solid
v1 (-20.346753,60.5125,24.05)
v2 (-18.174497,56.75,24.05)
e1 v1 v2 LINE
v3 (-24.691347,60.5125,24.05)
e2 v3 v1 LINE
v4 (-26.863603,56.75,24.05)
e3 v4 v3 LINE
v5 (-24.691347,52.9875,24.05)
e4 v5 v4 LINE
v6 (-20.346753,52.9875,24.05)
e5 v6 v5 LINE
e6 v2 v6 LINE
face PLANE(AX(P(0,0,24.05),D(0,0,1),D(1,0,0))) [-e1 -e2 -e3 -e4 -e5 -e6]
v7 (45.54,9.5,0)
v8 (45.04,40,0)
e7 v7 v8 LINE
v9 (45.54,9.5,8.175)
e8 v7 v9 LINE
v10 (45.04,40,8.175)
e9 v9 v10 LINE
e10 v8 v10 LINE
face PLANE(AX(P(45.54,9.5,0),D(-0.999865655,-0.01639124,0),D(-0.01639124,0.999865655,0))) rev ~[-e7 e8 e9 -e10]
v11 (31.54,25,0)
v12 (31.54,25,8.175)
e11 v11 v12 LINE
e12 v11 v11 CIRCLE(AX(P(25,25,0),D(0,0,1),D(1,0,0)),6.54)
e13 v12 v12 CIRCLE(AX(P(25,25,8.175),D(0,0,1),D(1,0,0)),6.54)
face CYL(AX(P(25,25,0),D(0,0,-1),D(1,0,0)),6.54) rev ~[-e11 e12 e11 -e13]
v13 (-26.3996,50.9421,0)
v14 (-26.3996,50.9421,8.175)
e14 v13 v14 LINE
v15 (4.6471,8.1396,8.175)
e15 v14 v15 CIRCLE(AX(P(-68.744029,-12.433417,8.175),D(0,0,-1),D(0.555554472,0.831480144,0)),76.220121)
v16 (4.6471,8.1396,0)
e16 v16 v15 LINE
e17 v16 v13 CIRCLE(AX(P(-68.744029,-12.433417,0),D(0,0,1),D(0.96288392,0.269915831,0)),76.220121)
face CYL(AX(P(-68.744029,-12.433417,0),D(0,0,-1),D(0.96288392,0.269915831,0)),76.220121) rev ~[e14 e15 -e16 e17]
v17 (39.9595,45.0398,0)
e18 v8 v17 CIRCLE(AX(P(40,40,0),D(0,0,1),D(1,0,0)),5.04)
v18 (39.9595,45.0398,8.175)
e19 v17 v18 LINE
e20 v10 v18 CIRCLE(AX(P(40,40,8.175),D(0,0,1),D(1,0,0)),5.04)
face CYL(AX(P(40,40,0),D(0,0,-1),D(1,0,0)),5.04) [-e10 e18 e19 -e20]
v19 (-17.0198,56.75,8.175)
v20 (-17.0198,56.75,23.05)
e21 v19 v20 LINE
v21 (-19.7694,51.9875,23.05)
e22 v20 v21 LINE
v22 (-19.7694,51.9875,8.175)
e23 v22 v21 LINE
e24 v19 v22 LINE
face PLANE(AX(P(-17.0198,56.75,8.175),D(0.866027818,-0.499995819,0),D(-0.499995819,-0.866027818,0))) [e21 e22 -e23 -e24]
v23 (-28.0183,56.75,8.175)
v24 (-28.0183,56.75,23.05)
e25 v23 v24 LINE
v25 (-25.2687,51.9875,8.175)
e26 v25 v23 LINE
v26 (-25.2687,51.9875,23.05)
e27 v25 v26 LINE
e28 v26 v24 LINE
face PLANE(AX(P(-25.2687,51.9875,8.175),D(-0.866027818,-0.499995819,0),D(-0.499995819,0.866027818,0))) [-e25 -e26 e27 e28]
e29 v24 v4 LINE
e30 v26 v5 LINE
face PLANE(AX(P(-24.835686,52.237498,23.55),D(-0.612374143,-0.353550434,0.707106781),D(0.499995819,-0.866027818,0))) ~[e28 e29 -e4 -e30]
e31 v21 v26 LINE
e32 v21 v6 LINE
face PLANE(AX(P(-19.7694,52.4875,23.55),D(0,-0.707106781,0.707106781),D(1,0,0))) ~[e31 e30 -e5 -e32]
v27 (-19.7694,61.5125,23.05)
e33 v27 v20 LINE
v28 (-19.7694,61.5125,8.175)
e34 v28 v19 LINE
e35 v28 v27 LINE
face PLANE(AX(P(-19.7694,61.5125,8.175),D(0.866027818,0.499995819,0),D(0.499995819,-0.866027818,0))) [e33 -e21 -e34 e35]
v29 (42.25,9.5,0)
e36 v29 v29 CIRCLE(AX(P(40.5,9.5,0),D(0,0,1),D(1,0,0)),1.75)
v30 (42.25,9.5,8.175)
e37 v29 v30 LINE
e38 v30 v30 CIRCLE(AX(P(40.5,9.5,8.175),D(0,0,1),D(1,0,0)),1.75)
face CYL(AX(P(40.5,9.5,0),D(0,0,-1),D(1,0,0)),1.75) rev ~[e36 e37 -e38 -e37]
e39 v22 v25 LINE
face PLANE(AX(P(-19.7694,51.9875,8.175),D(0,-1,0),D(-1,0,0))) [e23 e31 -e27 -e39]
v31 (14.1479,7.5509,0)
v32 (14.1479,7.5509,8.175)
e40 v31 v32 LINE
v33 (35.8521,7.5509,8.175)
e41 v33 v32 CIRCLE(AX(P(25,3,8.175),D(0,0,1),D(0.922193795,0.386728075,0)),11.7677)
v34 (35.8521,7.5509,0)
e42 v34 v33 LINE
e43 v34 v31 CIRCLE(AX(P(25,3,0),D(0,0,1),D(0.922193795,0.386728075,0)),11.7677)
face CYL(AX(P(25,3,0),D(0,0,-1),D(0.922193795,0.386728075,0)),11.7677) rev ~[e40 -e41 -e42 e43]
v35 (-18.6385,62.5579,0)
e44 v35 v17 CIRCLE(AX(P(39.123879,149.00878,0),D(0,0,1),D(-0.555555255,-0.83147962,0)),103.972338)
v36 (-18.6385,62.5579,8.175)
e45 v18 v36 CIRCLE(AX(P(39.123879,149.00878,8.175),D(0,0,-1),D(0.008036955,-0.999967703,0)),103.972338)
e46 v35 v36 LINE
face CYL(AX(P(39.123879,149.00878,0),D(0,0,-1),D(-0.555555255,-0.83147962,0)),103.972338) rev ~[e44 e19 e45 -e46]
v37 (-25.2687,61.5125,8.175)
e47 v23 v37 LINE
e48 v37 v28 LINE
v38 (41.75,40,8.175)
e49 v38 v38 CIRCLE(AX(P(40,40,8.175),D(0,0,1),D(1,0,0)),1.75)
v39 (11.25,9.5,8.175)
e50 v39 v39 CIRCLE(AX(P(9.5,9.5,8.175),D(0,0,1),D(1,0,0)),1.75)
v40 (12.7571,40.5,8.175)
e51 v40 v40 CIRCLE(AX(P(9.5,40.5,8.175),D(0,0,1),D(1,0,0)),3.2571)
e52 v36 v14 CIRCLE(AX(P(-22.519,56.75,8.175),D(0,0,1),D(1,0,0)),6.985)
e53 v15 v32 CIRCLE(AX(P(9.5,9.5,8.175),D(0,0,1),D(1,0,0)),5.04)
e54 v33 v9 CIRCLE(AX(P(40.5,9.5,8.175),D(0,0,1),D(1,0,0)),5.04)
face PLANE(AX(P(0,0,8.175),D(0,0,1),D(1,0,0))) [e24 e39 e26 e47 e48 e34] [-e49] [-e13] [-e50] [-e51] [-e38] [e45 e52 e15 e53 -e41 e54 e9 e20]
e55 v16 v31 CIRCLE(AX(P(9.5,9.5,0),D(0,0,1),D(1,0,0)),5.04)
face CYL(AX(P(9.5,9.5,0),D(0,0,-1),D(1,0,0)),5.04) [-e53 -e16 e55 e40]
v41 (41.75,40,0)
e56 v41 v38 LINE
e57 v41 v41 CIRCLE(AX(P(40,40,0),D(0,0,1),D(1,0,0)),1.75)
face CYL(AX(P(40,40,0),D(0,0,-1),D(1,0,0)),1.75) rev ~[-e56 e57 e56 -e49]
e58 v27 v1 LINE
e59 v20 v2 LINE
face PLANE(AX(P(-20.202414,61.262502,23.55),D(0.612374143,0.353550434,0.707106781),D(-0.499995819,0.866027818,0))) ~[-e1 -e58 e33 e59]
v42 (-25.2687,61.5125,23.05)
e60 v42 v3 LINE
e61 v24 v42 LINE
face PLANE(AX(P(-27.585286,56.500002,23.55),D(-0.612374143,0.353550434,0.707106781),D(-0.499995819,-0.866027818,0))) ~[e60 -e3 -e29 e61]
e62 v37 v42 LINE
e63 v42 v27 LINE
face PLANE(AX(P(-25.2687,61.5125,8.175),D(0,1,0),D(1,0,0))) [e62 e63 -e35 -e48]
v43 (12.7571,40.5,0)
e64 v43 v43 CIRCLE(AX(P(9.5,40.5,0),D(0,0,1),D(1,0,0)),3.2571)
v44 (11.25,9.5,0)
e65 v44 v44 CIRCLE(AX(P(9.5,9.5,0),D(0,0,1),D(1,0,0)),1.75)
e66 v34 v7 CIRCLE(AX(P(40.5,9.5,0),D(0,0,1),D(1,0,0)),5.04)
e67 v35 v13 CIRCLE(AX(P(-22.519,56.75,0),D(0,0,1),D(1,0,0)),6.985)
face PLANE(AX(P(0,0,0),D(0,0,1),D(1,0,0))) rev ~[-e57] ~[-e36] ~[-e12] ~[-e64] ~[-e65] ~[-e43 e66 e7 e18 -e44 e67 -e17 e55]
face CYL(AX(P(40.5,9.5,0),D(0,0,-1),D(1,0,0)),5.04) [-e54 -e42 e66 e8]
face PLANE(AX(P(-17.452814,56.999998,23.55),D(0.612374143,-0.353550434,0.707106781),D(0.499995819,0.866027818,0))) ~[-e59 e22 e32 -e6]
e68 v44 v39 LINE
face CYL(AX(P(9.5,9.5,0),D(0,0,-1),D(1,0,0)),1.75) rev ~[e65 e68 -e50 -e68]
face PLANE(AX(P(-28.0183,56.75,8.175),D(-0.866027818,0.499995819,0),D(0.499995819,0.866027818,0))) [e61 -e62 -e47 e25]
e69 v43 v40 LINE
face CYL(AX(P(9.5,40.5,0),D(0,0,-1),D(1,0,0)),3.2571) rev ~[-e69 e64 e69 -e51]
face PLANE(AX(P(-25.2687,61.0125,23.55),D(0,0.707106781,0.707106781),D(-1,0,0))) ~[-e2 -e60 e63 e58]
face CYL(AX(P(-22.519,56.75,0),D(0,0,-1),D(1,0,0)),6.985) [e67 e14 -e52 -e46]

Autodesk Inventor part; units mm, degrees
ref_plane "YZ Plane" through (0, 0, 0) normal (1, 0, 0) x (0, 1, 0)
ref_plane "XZ Plane" through (0, 0, 0) normal (0, 1, 0) x (-1, 0, 0)
ref_plane "XY Plane" through (0, 0, 0) normal (0, 0, 1) x (1, 0, 0)
sketch "Sketch1" plane through (0, 0, 0) normal (0, 0, 1) x (1, 0, 0)
  circle A0 centre (9.5, 9.5) radius 2.5 projected
  circle A1 centre (40, 40) radius 2.5 projected
  circle A2 centre (40.5, 9.5) radius 2.5 projected
  circle A3 centre (9.5, 40.5) radius 2.5 projected
  line L0 (47.46, 3) -> (27.54, 3) projected
  line L1 (47.46, 3) -> (47.46, 12.7) projected
  line L2 (47.46, 12.7) -> (50, 12.7) projected
  line L3 (50, 12.7) -> (50, 40) projected
  arc A4 (50, 40) -> (40, 50) centre (40, 40) ccw projected
  line L4 (10, 50) -> (40, 50) projected
  arc A5 (10, 50) -> (0, 40) centre (10, 40) ccw projected
  line L5 (0, 12.7) -> (0, 40) projected
  line L6 (0, 12.7) -> (2.54, 12.7) projected
  line L7 (2.54, 12.7) -> (2.54, 3) projected
  line L8 (22.46, 3) -> (2.54, 3) projected
  line L9 (22.46, 3) -> (22.46, 12.7) projected
  line L10 (22.46, 12.7) -> (27.54, 12.7) projected
  line L11 (27.54, 12.7) -> (27.54, 3) projected
  circle A6 centre (25, 25) radius 4 projected
  line L12 (25, 25) -> (-22.519, 56.75) construction
  line L13 (-22.519, 56.75) -> (25, 56.75) construction
  line L14 (25, 56.75) -> (25, 25) construction
  line L15 (-28.0183, 56.75) -> (-25.2687, 61.5125)
  line L16 (-25.2687, 61.5125) -> (-19.7694, 61.5125)
  line L17 (-19.7694, 61.5125) -> (-17.0198, 56.75)
  line L18 (-17.0198, 56.75) -> (-19.7694, 51.9875)
  line L19 (-19.7694, 51.9875) -> (-25.2687, 51.9875)
  line L20 (-25.2687, 51.9875) -> (-28.0183, 56.75)
  line L21 (-19.7694, 61.5125) -> (-25.2687, 51.9875) construction
  circle A7 centre (-22.519, 56.75) radius 6.985
  circle A8 centre (40, 40) radius 5.04
  circle A9 centre (40.5, 9.5) radius 5.04
  circle A10 centre (9.5, 9.5) radius 5.04
  arc A11 (35.8521, 7.5509) -> (14.1479, 7.5509) centre (25, 3) ccw
  arc A12 (4.6471, 8.1396) -> (-26.3996, 50.9421) centre (-68.7442, -12.4335) ccw
  arc A13 (-18.6385, 62.5579) -> (39.9595, 45.0398) centre (39.1237, 149.0084) ccw
  circle A14 centre (25, 25) radius 6.54
  line L22 (-26.3996, 50.9421) -> (-15.682, 43.7811) construction
  line L23 (-18.6385, 62.5579) -> (-6.4516, 54.4152) construction
  line L24 (45.54, 9.5) -> (45.04, 40)
  circle A15 centre (40, 40) radius 1.75 projected
  circle A16 centre (40.5, 9.5) radius 1.75 projected
  circle A17 centre (9.5, 9.5) radius 1.75 projected
  circle A18 centre (9.5, 40.5) radius 3.2571
  point P0 (0, 0)
  dimension "d0" = 57.15
  dimension "d1" = 31.75
  dimension "d3" = 120
  dimension "d4" = 120
  dimension "d5" = 9.525
  dimension "d6" = 13.97
  dimension "d7" = 2.54
  dimension "d8" = 2.54
  dimension "d9" = 2.54
  dimension "d11" = 2.54
extrude "Extrusion1" add sketch "Sketch1" along normal blind 8.175 contours A0 | A1 | A2 | A9 | A13 A8 L24 A9 A11 A10 A12 L5 A5 | A5 L5 A12 A7 A13 | A7 | A8 | A10 | L15 L16 L17 L18 L19 L20
sketch "Sketch2" plane through (0, 0, 8.175) normal (0, 0, 1) x (1, 0, 0)
  line L0 (-25.2687, 51.9875) -> (-28.0183, 56.75) projected
  line L1 (-28.0183, 56.75) -> (-25.2687, 61.5125) projected
  line L2 (-25.2687, 61.5125) -> (-19.7694, 61.5125) projected
  line L3 (-19.7694, 61.5125) -> (-17.0198, 56.75) projected
  line L4 (-17.0198, 56.75) -> (-19.7694, 51.9875) projected
  line L5 (-19.7694, 51.9875) -> (-25.2687, 51.9875) projected
  point P0 (0, 0)
extrude "Extrusion2" add sketch "Sketch2" along normal blind 15.875
chamfer "Chamfer1" distance 1 angle 45 6 edges at (-22.519, 61.5125, 24.05) (-26.6435, 59.1312, 24.05) (-26.6435, 54.3687, 24.05) (-22.519, 51.9875, 24.05) (-18.3946, 59.1312, 24.05) (-18.3946, 54.3687, 24.05)
properties part number "ArmGearMount"
